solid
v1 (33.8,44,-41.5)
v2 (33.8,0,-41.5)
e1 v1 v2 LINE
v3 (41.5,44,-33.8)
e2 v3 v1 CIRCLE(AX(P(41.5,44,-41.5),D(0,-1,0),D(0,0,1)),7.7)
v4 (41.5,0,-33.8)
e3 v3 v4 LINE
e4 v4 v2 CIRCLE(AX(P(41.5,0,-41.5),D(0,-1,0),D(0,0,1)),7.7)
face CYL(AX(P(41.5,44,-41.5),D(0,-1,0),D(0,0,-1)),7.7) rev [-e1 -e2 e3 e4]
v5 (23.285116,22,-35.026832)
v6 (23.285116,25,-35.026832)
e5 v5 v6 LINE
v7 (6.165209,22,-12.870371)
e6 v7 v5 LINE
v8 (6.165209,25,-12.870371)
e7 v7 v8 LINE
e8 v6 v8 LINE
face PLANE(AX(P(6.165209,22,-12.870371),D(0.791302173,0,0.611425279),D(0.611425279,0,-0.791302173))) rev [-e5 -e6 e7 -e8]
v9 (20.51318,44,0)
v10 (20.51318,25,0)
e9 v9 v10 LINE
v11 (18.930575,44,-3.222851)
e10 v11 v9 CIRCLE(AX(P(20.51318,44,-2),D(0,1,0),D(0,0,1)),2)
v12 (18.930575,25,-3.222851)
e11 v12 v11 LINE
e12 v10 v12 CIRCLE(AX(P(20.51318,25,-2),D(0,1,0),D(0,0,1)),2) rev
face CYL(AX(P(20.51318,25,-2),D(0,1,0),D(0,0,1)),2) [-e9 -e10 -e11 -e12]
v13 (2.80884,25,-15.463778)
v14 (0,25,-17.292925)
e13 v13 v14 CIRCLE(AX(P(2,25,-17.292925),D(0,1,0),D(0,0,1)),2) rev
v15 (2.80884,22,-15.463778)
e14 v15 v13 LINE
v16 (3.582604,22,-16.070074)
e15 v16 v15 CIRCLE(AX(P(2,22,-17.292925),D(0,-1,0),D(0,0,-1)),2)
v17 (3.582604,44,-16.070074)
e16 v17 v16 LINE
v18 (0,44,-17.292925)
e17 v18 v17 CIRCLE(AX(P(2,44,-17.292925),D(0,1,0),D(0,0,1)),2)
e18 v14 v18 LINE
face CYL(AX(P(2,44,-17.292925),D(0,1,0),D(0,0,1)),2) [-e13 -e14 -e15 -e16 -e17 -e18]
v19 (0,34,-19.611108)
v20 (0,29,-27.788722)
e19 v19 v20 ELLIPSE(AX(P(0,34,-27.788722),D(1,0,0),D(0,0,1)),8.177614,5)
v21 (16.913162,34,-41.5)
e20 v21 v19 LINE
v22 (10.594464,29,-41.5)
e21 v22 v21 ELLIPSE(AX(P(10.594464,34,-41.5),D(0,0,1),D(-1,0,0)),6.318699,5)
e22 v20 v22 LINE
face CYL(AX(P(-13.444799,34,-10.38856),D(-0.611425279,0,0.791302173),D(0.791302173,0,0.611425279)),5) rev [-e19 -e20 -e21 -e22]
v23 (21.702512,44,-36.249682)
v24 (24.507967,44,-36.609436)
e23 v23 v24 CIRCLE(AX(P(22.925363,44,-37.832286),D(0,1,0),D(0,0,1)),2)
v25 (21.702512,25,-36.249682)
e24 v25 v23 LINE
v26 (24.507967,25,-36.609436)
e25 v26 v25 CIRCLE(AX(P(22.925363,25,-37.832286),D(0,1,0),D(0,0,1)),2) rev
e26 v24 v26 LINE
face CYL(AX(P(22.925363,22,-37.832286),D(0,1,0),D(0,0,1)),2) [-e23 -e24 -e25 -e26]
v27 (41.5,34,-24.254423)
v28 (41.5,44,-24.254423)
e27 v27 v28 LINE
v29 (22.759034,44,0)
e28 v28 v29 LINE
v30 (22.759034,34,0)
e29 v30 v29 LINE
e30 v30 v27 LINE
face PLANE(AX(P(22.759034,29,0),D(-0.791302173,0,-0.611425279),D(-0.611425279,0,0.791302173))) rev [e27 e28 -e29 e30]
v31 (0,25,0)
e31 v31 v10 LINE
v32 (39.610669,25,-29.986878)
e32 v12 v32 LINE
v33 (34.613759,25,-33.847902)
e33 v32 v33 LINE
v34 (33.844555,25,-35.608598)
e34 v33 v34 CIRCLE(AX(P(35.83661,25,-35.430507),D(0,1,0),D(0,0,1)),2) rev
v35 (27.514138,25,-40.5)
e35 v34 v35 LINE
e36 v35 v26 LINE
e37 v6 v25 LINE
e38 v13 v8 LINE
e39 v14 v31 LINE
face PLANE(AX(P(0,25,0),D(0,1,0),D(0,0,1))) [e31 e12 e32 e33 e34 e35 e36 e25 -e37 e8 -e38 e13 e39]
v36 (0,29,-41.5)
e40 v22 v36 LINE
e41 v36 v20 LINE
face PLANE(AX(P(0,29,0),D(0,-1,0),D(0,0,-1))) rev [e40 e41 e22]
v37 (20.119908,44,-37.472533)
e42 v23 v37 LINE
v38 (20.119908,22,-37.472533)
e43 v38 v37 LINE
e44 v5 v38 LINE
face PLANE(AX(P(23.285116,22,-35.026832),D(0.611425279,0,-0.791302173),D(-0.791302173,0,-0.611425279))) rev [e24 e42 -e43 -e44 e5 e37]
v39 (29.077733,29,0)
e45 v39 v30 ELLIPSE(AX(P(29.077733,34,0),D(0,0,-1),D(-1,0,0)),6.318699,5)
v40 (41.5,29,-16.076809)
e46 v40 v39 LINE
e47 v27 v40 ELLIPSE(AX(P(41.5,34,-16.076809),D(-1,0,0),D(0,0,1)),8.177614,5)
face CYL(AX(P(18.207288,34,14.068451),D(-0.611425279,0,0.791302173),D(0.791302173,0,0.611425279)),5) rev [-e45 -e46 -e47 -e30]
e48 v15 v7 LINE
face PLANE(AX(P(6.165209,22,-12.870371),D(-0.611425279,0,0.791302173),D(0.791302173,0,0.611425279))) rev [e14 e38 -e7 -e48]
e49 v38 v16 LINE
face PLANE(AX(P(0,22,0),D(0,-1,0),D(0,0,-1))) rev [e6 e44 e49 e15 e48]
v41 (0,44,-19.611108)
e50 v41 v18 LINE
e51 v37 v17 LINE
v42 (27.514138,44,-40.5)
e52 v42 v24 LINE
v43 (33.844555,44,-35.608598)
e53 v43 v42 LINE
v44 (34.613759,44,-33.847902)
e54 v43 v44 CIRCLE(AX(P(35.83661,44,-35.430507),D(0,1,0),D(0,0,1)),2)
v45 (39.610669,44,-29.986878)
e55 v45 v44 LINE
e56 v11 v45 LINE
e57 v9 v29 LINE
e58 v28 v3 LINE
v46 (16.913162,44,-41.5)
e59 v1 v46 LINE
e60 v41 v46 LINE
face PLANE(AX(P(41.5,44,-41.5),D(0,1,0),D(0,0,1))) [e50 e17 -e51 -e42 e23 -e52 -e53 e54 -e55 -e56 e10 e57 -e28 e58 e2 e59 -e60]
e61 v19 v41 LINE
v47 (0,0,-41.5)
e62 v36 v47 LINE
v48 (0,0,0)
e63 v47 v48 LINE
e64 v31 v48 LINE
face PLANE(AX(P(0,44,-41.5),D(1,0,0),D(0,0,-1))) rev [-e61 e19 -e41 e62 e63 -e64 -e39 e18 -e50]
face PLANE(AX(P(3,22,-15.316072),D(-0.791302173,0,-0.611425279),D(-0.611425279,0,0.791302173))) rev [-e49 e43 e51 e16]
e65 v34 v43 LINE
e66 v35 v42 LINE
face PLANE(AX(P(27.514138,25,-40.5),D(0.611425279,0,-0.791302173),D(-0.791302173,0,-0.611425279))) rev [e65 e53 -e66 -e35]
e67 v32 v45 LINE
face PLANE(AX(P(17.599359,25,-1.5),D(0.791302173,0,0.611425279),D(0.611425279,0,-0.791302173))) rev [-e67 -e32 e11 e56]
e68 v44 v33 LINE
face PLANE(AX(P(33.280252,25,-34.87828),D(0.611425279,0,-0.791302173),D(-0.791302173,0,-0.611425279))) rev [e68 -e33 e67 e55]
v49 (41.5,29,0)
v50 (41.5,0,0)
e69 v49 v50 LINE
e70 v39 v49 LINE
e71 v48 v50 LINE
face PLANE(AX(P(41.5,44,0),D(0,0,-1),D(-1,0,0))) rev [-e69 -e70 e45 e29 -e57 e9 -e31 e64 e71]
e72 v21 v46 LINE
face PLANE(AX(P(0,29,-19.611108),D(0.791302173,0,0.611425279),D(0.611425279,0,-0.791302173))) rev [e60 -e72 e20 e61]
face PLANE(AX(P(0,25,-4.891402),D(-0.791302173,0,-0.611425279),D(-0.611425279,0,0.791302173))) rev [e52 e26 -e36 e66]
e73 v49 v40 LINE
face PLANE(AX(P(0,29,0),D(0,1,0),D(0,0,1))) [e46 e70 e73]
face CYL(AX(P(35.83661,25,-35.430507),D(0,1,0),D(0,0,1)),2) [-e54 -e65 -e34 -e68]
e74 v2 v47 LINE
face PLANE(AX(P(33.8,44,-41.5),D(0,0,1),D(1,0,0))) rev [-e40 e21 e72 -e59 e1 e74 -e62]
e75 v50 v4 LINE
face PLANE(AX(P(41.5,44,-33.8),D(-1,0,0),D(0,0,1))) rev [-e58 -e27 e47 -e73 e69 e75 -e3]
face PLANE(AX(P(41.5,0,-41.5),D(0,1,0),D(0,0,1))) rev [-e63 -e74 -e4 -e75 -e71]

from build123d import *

# Parameters (mm, degrees)
BOSS_EXTRUDE1_DEPTH = 44
CUT_EXTRUDE1_DEPTH  = 19
CUT_EXTRUDE2_DEPTH  = 22
CUT_EXTRUDE3_DEPTH  = 19
CUT_EXTRUDE4_DEPTH  = 19
CUT_EXTRUDE5_DEPTH  = 15
FILLET1_R           = 2
FILLET2_R           = 5


with BuildPart() as part:
    # Sketch1 → Boss-Extrude1 (new body)
    with BuildSketch(Plane(origin=(0, 0, 0), x_dir=(1, 0, 0), z_dir=(0, 1, 0))):
        with BuildLine():
            Line((33.8, 41.5), (0, 41.5))
            Line((0, 41.5), (0, 0))
            Line((0, 0), (41.5, 0))
            Line((41.5, 0), (41.5, 33.8))
            ThreePointArc((41.5, 33.8), (36.055277785, 36.055277785), (33.8, 41.5))
        make_face()
    extrude(amount=BOSS_EXTRUDE1_DEPTH)

    # Sketch2 → Cut-Extrude1 (cut)
    with BuildSketch(Plane(origin=(0, 44, 0), x_dir=(1, 0, 0), z_dir=(0, 1, 0))):
        Polygon((6.330417381, 0), (0, 0), (0, 4.89140223), (27.514137546, 40.5), (33.844554927, 35.60859777), align=None)
    extrude(amount=-CUT_EXTRUDE1_DEPTH, mode=Mode.SUBTRACT)

    # Sketch3 → Cut-Extrude2 (cut)
    with BuildSketch(Plane(origin=(0, 44, 0), x_dir=(1, 0, 0), z_dir=(0, 1, 0))):
        Polygon((6.165208691, 12.870370718), (23.285116497, 35.026831552), (20.119907806, 37.472532667), (3, 15.316071833), align=None)
    extrude(amount=-CUT_EXTRUDE2_DEPTH, mode=Mode.SUBTRACT)

    # Sketch5 → Cut-Extrude3 (cut)
    with BuildSketch(Plane(origin=(0, 44, 0), x_dir=(1, 0, 0), z_dir=(0, 1, 0))):
        Polygon((11.268941532, 6.39140223), (33.280251569, 34.878280446), (39.61066895, 29.986878216), (17.599358914, 1.5), align=None)
    extrude(amount=-CUT_EXTRUDE3_DEPTH, mode=Mode.SUBTRACT)

    # Sketch6 → Cut-Extrude4 (cut)
    with BuildSketch(Plane(origin=(0, 44, 0), x_dir=(1, 0, 0), z_dir=(0, 1, 0))):
        Polygon((17.599358914, 1.5), (16.440335282, 0), (0, 0), (0, 11.433493535), (3, 15.316071833), (6.165208691, 12.870370718), (11.268941532, 6.39140223), align=None)
    extrude(amount=-CUT_EXTRUDE4_DEPTH, mode=Mode.SUBTRACT)

    # Sketch7 → Cut-Extrude5 (cut)
    with BuildSketch(Plane(origin=(0, 44, 0), x_dir=(1, 0, 0), z_dir=(0, 1, 0))):
        Polygon((22.759033969, 0), (41.5, 24.254422662), (41.5, 0), align=None)
        Polygon((0, 19.611107666), (16.913162329, 41.5), (0, 41.5), align=None)
    extrude(amount=-CUT_EXTRUDE5_DEPTH, mode=Mode.SUBTRACT)

    # Fillet1
    # the kernel refuses this fillet: 2 mm, written as the material it takes off along each edge
    with BuildSketch(Plane(origin=(33.280251569, 48.213017341, -34.878280446), x_dir=(0.7913021726593984, 0, 0.6114252787908885), z_dir=(0, -1, 0))) as fillet1_piece_1:
        with BuildLine():
            CenterArc((1.685206936, -2), FILLET1_R, 90, 57.416069246)
            Line((0, -0.922931023), (0, 0))
            Line((0, 0), (1.685206936, 0))
        make_face()
    extrude(amount=23.213017341, mode=Mode.SUBTRACT)
    with BuildSketch(Plane(origin=(23.285116497, 49, -35.026831552), x_dir=(0.6114252787908897, 0, -0.7913021726593975), z_dir=(0, -1, 0))) as fillet1_piece_2:
        with BuildLine():
            CenterArc((FILLET1_R, -FILLET1_R), FILLET1_R, 90, 90)
            Line((0, -FILLET1_R), (0, 0))
            Line((0, 0), (FILLET1_R, 0))
        make_face()
    extrude(amount=24, mode=Mode.SUBTRACT)
    with BuildSketch(Plane(origin=(16.440335282, 54.182110795, 0), x_dir=(1, 0, 0), z_dir=(0, -1, 0))) as fillet1_piece_3:
        with BuildLine():
            CenterArc((FILLET1_R * 2.0364221589, -FILLET1_R), FILLET1_R, 90, 127.692631401)
            Line((FILLET1_R * 1.24511998624, -FILLET1_R * 1.61142527879), (0, 0))
            Line((0, 0), (FILLET1_R * 2.0364221589, 0))
        make_face()
    extrude(amount=29.182110795, mode=Mode.SUBTRACT)
    with BuildSketch(Plane(origin=(0, 58.64857796, -11.433493535), x_dir=(0, 0, -1), z_dir=(0, -1, 0))) as fillet1_piece_4:
        with BuildLine():
            CenterArc((FILLET1_R * 2.92971559207, FILLET1_R), FILLET1_R, 127.692631401, 142.307368599)
            Line((FILLET1_R * 2.31829031328, FILLET1_R * 1.79130217266), (0, 0))
            Line((0, 0), (FILLET1_R * 2.92971559207, 0))
        make_face()
    extrude(amount=33.64857796, mode=Mode.SUBTRACT)
    with BuildSketch(Plane(origin=(0, 58.64857796, -11.433493535), x_dir=(0, 0, -1), z_dir=(0, -1, 0))) as fillet1_piece_5_section:
        with BuildLine():
            CenterArc((FILLET1_R * 2.92971559207, FILLET1_R), FILLET1_R, 127.692631401, 142.307368599)
            Line((FILLET1_R * 2.31829031328, FILLET1_R * 1.79130217266), (0, 0))
            Line((0, 0), (FILLET1_R * 2.92971559207, 0))
        make_face()
    fillet1_piece_5 = extrude(amount=48.297155921, mode=Mode.PRIVATE)
    fillet1_piece_5 = split(fillet1_piece_5, bisect_by=Plane(origin=(2.943298817, 23.5, -15.35988384), z_dir=(0.6114252787908899, 0, -0.7913021726593973)), keep=Keep.TOP, mode=Mode.PRIVATE)
    fillet1_piece_5 = split(fillet1_piece_5, bisect_by=Plane(origin=(3.087132223, 22, -15.546031994), z_dir=(0, 1, 0)), keep=Keep.TOP, mode=Mode.PRIVATE)
    add(fillet1_piece_5, mode=Mode.SUBTRACT)

    # Fillet2
    fillet2_edges = [part.edges().sort_by_distance(p)[0] for p in [
        (32.129516985, 29, -12.127211331),
        (8.456581164, 29, -30.555553833),
    ]]
    fillet(fillet2_edges, radius=FILLET2_R)


solid = part.part
